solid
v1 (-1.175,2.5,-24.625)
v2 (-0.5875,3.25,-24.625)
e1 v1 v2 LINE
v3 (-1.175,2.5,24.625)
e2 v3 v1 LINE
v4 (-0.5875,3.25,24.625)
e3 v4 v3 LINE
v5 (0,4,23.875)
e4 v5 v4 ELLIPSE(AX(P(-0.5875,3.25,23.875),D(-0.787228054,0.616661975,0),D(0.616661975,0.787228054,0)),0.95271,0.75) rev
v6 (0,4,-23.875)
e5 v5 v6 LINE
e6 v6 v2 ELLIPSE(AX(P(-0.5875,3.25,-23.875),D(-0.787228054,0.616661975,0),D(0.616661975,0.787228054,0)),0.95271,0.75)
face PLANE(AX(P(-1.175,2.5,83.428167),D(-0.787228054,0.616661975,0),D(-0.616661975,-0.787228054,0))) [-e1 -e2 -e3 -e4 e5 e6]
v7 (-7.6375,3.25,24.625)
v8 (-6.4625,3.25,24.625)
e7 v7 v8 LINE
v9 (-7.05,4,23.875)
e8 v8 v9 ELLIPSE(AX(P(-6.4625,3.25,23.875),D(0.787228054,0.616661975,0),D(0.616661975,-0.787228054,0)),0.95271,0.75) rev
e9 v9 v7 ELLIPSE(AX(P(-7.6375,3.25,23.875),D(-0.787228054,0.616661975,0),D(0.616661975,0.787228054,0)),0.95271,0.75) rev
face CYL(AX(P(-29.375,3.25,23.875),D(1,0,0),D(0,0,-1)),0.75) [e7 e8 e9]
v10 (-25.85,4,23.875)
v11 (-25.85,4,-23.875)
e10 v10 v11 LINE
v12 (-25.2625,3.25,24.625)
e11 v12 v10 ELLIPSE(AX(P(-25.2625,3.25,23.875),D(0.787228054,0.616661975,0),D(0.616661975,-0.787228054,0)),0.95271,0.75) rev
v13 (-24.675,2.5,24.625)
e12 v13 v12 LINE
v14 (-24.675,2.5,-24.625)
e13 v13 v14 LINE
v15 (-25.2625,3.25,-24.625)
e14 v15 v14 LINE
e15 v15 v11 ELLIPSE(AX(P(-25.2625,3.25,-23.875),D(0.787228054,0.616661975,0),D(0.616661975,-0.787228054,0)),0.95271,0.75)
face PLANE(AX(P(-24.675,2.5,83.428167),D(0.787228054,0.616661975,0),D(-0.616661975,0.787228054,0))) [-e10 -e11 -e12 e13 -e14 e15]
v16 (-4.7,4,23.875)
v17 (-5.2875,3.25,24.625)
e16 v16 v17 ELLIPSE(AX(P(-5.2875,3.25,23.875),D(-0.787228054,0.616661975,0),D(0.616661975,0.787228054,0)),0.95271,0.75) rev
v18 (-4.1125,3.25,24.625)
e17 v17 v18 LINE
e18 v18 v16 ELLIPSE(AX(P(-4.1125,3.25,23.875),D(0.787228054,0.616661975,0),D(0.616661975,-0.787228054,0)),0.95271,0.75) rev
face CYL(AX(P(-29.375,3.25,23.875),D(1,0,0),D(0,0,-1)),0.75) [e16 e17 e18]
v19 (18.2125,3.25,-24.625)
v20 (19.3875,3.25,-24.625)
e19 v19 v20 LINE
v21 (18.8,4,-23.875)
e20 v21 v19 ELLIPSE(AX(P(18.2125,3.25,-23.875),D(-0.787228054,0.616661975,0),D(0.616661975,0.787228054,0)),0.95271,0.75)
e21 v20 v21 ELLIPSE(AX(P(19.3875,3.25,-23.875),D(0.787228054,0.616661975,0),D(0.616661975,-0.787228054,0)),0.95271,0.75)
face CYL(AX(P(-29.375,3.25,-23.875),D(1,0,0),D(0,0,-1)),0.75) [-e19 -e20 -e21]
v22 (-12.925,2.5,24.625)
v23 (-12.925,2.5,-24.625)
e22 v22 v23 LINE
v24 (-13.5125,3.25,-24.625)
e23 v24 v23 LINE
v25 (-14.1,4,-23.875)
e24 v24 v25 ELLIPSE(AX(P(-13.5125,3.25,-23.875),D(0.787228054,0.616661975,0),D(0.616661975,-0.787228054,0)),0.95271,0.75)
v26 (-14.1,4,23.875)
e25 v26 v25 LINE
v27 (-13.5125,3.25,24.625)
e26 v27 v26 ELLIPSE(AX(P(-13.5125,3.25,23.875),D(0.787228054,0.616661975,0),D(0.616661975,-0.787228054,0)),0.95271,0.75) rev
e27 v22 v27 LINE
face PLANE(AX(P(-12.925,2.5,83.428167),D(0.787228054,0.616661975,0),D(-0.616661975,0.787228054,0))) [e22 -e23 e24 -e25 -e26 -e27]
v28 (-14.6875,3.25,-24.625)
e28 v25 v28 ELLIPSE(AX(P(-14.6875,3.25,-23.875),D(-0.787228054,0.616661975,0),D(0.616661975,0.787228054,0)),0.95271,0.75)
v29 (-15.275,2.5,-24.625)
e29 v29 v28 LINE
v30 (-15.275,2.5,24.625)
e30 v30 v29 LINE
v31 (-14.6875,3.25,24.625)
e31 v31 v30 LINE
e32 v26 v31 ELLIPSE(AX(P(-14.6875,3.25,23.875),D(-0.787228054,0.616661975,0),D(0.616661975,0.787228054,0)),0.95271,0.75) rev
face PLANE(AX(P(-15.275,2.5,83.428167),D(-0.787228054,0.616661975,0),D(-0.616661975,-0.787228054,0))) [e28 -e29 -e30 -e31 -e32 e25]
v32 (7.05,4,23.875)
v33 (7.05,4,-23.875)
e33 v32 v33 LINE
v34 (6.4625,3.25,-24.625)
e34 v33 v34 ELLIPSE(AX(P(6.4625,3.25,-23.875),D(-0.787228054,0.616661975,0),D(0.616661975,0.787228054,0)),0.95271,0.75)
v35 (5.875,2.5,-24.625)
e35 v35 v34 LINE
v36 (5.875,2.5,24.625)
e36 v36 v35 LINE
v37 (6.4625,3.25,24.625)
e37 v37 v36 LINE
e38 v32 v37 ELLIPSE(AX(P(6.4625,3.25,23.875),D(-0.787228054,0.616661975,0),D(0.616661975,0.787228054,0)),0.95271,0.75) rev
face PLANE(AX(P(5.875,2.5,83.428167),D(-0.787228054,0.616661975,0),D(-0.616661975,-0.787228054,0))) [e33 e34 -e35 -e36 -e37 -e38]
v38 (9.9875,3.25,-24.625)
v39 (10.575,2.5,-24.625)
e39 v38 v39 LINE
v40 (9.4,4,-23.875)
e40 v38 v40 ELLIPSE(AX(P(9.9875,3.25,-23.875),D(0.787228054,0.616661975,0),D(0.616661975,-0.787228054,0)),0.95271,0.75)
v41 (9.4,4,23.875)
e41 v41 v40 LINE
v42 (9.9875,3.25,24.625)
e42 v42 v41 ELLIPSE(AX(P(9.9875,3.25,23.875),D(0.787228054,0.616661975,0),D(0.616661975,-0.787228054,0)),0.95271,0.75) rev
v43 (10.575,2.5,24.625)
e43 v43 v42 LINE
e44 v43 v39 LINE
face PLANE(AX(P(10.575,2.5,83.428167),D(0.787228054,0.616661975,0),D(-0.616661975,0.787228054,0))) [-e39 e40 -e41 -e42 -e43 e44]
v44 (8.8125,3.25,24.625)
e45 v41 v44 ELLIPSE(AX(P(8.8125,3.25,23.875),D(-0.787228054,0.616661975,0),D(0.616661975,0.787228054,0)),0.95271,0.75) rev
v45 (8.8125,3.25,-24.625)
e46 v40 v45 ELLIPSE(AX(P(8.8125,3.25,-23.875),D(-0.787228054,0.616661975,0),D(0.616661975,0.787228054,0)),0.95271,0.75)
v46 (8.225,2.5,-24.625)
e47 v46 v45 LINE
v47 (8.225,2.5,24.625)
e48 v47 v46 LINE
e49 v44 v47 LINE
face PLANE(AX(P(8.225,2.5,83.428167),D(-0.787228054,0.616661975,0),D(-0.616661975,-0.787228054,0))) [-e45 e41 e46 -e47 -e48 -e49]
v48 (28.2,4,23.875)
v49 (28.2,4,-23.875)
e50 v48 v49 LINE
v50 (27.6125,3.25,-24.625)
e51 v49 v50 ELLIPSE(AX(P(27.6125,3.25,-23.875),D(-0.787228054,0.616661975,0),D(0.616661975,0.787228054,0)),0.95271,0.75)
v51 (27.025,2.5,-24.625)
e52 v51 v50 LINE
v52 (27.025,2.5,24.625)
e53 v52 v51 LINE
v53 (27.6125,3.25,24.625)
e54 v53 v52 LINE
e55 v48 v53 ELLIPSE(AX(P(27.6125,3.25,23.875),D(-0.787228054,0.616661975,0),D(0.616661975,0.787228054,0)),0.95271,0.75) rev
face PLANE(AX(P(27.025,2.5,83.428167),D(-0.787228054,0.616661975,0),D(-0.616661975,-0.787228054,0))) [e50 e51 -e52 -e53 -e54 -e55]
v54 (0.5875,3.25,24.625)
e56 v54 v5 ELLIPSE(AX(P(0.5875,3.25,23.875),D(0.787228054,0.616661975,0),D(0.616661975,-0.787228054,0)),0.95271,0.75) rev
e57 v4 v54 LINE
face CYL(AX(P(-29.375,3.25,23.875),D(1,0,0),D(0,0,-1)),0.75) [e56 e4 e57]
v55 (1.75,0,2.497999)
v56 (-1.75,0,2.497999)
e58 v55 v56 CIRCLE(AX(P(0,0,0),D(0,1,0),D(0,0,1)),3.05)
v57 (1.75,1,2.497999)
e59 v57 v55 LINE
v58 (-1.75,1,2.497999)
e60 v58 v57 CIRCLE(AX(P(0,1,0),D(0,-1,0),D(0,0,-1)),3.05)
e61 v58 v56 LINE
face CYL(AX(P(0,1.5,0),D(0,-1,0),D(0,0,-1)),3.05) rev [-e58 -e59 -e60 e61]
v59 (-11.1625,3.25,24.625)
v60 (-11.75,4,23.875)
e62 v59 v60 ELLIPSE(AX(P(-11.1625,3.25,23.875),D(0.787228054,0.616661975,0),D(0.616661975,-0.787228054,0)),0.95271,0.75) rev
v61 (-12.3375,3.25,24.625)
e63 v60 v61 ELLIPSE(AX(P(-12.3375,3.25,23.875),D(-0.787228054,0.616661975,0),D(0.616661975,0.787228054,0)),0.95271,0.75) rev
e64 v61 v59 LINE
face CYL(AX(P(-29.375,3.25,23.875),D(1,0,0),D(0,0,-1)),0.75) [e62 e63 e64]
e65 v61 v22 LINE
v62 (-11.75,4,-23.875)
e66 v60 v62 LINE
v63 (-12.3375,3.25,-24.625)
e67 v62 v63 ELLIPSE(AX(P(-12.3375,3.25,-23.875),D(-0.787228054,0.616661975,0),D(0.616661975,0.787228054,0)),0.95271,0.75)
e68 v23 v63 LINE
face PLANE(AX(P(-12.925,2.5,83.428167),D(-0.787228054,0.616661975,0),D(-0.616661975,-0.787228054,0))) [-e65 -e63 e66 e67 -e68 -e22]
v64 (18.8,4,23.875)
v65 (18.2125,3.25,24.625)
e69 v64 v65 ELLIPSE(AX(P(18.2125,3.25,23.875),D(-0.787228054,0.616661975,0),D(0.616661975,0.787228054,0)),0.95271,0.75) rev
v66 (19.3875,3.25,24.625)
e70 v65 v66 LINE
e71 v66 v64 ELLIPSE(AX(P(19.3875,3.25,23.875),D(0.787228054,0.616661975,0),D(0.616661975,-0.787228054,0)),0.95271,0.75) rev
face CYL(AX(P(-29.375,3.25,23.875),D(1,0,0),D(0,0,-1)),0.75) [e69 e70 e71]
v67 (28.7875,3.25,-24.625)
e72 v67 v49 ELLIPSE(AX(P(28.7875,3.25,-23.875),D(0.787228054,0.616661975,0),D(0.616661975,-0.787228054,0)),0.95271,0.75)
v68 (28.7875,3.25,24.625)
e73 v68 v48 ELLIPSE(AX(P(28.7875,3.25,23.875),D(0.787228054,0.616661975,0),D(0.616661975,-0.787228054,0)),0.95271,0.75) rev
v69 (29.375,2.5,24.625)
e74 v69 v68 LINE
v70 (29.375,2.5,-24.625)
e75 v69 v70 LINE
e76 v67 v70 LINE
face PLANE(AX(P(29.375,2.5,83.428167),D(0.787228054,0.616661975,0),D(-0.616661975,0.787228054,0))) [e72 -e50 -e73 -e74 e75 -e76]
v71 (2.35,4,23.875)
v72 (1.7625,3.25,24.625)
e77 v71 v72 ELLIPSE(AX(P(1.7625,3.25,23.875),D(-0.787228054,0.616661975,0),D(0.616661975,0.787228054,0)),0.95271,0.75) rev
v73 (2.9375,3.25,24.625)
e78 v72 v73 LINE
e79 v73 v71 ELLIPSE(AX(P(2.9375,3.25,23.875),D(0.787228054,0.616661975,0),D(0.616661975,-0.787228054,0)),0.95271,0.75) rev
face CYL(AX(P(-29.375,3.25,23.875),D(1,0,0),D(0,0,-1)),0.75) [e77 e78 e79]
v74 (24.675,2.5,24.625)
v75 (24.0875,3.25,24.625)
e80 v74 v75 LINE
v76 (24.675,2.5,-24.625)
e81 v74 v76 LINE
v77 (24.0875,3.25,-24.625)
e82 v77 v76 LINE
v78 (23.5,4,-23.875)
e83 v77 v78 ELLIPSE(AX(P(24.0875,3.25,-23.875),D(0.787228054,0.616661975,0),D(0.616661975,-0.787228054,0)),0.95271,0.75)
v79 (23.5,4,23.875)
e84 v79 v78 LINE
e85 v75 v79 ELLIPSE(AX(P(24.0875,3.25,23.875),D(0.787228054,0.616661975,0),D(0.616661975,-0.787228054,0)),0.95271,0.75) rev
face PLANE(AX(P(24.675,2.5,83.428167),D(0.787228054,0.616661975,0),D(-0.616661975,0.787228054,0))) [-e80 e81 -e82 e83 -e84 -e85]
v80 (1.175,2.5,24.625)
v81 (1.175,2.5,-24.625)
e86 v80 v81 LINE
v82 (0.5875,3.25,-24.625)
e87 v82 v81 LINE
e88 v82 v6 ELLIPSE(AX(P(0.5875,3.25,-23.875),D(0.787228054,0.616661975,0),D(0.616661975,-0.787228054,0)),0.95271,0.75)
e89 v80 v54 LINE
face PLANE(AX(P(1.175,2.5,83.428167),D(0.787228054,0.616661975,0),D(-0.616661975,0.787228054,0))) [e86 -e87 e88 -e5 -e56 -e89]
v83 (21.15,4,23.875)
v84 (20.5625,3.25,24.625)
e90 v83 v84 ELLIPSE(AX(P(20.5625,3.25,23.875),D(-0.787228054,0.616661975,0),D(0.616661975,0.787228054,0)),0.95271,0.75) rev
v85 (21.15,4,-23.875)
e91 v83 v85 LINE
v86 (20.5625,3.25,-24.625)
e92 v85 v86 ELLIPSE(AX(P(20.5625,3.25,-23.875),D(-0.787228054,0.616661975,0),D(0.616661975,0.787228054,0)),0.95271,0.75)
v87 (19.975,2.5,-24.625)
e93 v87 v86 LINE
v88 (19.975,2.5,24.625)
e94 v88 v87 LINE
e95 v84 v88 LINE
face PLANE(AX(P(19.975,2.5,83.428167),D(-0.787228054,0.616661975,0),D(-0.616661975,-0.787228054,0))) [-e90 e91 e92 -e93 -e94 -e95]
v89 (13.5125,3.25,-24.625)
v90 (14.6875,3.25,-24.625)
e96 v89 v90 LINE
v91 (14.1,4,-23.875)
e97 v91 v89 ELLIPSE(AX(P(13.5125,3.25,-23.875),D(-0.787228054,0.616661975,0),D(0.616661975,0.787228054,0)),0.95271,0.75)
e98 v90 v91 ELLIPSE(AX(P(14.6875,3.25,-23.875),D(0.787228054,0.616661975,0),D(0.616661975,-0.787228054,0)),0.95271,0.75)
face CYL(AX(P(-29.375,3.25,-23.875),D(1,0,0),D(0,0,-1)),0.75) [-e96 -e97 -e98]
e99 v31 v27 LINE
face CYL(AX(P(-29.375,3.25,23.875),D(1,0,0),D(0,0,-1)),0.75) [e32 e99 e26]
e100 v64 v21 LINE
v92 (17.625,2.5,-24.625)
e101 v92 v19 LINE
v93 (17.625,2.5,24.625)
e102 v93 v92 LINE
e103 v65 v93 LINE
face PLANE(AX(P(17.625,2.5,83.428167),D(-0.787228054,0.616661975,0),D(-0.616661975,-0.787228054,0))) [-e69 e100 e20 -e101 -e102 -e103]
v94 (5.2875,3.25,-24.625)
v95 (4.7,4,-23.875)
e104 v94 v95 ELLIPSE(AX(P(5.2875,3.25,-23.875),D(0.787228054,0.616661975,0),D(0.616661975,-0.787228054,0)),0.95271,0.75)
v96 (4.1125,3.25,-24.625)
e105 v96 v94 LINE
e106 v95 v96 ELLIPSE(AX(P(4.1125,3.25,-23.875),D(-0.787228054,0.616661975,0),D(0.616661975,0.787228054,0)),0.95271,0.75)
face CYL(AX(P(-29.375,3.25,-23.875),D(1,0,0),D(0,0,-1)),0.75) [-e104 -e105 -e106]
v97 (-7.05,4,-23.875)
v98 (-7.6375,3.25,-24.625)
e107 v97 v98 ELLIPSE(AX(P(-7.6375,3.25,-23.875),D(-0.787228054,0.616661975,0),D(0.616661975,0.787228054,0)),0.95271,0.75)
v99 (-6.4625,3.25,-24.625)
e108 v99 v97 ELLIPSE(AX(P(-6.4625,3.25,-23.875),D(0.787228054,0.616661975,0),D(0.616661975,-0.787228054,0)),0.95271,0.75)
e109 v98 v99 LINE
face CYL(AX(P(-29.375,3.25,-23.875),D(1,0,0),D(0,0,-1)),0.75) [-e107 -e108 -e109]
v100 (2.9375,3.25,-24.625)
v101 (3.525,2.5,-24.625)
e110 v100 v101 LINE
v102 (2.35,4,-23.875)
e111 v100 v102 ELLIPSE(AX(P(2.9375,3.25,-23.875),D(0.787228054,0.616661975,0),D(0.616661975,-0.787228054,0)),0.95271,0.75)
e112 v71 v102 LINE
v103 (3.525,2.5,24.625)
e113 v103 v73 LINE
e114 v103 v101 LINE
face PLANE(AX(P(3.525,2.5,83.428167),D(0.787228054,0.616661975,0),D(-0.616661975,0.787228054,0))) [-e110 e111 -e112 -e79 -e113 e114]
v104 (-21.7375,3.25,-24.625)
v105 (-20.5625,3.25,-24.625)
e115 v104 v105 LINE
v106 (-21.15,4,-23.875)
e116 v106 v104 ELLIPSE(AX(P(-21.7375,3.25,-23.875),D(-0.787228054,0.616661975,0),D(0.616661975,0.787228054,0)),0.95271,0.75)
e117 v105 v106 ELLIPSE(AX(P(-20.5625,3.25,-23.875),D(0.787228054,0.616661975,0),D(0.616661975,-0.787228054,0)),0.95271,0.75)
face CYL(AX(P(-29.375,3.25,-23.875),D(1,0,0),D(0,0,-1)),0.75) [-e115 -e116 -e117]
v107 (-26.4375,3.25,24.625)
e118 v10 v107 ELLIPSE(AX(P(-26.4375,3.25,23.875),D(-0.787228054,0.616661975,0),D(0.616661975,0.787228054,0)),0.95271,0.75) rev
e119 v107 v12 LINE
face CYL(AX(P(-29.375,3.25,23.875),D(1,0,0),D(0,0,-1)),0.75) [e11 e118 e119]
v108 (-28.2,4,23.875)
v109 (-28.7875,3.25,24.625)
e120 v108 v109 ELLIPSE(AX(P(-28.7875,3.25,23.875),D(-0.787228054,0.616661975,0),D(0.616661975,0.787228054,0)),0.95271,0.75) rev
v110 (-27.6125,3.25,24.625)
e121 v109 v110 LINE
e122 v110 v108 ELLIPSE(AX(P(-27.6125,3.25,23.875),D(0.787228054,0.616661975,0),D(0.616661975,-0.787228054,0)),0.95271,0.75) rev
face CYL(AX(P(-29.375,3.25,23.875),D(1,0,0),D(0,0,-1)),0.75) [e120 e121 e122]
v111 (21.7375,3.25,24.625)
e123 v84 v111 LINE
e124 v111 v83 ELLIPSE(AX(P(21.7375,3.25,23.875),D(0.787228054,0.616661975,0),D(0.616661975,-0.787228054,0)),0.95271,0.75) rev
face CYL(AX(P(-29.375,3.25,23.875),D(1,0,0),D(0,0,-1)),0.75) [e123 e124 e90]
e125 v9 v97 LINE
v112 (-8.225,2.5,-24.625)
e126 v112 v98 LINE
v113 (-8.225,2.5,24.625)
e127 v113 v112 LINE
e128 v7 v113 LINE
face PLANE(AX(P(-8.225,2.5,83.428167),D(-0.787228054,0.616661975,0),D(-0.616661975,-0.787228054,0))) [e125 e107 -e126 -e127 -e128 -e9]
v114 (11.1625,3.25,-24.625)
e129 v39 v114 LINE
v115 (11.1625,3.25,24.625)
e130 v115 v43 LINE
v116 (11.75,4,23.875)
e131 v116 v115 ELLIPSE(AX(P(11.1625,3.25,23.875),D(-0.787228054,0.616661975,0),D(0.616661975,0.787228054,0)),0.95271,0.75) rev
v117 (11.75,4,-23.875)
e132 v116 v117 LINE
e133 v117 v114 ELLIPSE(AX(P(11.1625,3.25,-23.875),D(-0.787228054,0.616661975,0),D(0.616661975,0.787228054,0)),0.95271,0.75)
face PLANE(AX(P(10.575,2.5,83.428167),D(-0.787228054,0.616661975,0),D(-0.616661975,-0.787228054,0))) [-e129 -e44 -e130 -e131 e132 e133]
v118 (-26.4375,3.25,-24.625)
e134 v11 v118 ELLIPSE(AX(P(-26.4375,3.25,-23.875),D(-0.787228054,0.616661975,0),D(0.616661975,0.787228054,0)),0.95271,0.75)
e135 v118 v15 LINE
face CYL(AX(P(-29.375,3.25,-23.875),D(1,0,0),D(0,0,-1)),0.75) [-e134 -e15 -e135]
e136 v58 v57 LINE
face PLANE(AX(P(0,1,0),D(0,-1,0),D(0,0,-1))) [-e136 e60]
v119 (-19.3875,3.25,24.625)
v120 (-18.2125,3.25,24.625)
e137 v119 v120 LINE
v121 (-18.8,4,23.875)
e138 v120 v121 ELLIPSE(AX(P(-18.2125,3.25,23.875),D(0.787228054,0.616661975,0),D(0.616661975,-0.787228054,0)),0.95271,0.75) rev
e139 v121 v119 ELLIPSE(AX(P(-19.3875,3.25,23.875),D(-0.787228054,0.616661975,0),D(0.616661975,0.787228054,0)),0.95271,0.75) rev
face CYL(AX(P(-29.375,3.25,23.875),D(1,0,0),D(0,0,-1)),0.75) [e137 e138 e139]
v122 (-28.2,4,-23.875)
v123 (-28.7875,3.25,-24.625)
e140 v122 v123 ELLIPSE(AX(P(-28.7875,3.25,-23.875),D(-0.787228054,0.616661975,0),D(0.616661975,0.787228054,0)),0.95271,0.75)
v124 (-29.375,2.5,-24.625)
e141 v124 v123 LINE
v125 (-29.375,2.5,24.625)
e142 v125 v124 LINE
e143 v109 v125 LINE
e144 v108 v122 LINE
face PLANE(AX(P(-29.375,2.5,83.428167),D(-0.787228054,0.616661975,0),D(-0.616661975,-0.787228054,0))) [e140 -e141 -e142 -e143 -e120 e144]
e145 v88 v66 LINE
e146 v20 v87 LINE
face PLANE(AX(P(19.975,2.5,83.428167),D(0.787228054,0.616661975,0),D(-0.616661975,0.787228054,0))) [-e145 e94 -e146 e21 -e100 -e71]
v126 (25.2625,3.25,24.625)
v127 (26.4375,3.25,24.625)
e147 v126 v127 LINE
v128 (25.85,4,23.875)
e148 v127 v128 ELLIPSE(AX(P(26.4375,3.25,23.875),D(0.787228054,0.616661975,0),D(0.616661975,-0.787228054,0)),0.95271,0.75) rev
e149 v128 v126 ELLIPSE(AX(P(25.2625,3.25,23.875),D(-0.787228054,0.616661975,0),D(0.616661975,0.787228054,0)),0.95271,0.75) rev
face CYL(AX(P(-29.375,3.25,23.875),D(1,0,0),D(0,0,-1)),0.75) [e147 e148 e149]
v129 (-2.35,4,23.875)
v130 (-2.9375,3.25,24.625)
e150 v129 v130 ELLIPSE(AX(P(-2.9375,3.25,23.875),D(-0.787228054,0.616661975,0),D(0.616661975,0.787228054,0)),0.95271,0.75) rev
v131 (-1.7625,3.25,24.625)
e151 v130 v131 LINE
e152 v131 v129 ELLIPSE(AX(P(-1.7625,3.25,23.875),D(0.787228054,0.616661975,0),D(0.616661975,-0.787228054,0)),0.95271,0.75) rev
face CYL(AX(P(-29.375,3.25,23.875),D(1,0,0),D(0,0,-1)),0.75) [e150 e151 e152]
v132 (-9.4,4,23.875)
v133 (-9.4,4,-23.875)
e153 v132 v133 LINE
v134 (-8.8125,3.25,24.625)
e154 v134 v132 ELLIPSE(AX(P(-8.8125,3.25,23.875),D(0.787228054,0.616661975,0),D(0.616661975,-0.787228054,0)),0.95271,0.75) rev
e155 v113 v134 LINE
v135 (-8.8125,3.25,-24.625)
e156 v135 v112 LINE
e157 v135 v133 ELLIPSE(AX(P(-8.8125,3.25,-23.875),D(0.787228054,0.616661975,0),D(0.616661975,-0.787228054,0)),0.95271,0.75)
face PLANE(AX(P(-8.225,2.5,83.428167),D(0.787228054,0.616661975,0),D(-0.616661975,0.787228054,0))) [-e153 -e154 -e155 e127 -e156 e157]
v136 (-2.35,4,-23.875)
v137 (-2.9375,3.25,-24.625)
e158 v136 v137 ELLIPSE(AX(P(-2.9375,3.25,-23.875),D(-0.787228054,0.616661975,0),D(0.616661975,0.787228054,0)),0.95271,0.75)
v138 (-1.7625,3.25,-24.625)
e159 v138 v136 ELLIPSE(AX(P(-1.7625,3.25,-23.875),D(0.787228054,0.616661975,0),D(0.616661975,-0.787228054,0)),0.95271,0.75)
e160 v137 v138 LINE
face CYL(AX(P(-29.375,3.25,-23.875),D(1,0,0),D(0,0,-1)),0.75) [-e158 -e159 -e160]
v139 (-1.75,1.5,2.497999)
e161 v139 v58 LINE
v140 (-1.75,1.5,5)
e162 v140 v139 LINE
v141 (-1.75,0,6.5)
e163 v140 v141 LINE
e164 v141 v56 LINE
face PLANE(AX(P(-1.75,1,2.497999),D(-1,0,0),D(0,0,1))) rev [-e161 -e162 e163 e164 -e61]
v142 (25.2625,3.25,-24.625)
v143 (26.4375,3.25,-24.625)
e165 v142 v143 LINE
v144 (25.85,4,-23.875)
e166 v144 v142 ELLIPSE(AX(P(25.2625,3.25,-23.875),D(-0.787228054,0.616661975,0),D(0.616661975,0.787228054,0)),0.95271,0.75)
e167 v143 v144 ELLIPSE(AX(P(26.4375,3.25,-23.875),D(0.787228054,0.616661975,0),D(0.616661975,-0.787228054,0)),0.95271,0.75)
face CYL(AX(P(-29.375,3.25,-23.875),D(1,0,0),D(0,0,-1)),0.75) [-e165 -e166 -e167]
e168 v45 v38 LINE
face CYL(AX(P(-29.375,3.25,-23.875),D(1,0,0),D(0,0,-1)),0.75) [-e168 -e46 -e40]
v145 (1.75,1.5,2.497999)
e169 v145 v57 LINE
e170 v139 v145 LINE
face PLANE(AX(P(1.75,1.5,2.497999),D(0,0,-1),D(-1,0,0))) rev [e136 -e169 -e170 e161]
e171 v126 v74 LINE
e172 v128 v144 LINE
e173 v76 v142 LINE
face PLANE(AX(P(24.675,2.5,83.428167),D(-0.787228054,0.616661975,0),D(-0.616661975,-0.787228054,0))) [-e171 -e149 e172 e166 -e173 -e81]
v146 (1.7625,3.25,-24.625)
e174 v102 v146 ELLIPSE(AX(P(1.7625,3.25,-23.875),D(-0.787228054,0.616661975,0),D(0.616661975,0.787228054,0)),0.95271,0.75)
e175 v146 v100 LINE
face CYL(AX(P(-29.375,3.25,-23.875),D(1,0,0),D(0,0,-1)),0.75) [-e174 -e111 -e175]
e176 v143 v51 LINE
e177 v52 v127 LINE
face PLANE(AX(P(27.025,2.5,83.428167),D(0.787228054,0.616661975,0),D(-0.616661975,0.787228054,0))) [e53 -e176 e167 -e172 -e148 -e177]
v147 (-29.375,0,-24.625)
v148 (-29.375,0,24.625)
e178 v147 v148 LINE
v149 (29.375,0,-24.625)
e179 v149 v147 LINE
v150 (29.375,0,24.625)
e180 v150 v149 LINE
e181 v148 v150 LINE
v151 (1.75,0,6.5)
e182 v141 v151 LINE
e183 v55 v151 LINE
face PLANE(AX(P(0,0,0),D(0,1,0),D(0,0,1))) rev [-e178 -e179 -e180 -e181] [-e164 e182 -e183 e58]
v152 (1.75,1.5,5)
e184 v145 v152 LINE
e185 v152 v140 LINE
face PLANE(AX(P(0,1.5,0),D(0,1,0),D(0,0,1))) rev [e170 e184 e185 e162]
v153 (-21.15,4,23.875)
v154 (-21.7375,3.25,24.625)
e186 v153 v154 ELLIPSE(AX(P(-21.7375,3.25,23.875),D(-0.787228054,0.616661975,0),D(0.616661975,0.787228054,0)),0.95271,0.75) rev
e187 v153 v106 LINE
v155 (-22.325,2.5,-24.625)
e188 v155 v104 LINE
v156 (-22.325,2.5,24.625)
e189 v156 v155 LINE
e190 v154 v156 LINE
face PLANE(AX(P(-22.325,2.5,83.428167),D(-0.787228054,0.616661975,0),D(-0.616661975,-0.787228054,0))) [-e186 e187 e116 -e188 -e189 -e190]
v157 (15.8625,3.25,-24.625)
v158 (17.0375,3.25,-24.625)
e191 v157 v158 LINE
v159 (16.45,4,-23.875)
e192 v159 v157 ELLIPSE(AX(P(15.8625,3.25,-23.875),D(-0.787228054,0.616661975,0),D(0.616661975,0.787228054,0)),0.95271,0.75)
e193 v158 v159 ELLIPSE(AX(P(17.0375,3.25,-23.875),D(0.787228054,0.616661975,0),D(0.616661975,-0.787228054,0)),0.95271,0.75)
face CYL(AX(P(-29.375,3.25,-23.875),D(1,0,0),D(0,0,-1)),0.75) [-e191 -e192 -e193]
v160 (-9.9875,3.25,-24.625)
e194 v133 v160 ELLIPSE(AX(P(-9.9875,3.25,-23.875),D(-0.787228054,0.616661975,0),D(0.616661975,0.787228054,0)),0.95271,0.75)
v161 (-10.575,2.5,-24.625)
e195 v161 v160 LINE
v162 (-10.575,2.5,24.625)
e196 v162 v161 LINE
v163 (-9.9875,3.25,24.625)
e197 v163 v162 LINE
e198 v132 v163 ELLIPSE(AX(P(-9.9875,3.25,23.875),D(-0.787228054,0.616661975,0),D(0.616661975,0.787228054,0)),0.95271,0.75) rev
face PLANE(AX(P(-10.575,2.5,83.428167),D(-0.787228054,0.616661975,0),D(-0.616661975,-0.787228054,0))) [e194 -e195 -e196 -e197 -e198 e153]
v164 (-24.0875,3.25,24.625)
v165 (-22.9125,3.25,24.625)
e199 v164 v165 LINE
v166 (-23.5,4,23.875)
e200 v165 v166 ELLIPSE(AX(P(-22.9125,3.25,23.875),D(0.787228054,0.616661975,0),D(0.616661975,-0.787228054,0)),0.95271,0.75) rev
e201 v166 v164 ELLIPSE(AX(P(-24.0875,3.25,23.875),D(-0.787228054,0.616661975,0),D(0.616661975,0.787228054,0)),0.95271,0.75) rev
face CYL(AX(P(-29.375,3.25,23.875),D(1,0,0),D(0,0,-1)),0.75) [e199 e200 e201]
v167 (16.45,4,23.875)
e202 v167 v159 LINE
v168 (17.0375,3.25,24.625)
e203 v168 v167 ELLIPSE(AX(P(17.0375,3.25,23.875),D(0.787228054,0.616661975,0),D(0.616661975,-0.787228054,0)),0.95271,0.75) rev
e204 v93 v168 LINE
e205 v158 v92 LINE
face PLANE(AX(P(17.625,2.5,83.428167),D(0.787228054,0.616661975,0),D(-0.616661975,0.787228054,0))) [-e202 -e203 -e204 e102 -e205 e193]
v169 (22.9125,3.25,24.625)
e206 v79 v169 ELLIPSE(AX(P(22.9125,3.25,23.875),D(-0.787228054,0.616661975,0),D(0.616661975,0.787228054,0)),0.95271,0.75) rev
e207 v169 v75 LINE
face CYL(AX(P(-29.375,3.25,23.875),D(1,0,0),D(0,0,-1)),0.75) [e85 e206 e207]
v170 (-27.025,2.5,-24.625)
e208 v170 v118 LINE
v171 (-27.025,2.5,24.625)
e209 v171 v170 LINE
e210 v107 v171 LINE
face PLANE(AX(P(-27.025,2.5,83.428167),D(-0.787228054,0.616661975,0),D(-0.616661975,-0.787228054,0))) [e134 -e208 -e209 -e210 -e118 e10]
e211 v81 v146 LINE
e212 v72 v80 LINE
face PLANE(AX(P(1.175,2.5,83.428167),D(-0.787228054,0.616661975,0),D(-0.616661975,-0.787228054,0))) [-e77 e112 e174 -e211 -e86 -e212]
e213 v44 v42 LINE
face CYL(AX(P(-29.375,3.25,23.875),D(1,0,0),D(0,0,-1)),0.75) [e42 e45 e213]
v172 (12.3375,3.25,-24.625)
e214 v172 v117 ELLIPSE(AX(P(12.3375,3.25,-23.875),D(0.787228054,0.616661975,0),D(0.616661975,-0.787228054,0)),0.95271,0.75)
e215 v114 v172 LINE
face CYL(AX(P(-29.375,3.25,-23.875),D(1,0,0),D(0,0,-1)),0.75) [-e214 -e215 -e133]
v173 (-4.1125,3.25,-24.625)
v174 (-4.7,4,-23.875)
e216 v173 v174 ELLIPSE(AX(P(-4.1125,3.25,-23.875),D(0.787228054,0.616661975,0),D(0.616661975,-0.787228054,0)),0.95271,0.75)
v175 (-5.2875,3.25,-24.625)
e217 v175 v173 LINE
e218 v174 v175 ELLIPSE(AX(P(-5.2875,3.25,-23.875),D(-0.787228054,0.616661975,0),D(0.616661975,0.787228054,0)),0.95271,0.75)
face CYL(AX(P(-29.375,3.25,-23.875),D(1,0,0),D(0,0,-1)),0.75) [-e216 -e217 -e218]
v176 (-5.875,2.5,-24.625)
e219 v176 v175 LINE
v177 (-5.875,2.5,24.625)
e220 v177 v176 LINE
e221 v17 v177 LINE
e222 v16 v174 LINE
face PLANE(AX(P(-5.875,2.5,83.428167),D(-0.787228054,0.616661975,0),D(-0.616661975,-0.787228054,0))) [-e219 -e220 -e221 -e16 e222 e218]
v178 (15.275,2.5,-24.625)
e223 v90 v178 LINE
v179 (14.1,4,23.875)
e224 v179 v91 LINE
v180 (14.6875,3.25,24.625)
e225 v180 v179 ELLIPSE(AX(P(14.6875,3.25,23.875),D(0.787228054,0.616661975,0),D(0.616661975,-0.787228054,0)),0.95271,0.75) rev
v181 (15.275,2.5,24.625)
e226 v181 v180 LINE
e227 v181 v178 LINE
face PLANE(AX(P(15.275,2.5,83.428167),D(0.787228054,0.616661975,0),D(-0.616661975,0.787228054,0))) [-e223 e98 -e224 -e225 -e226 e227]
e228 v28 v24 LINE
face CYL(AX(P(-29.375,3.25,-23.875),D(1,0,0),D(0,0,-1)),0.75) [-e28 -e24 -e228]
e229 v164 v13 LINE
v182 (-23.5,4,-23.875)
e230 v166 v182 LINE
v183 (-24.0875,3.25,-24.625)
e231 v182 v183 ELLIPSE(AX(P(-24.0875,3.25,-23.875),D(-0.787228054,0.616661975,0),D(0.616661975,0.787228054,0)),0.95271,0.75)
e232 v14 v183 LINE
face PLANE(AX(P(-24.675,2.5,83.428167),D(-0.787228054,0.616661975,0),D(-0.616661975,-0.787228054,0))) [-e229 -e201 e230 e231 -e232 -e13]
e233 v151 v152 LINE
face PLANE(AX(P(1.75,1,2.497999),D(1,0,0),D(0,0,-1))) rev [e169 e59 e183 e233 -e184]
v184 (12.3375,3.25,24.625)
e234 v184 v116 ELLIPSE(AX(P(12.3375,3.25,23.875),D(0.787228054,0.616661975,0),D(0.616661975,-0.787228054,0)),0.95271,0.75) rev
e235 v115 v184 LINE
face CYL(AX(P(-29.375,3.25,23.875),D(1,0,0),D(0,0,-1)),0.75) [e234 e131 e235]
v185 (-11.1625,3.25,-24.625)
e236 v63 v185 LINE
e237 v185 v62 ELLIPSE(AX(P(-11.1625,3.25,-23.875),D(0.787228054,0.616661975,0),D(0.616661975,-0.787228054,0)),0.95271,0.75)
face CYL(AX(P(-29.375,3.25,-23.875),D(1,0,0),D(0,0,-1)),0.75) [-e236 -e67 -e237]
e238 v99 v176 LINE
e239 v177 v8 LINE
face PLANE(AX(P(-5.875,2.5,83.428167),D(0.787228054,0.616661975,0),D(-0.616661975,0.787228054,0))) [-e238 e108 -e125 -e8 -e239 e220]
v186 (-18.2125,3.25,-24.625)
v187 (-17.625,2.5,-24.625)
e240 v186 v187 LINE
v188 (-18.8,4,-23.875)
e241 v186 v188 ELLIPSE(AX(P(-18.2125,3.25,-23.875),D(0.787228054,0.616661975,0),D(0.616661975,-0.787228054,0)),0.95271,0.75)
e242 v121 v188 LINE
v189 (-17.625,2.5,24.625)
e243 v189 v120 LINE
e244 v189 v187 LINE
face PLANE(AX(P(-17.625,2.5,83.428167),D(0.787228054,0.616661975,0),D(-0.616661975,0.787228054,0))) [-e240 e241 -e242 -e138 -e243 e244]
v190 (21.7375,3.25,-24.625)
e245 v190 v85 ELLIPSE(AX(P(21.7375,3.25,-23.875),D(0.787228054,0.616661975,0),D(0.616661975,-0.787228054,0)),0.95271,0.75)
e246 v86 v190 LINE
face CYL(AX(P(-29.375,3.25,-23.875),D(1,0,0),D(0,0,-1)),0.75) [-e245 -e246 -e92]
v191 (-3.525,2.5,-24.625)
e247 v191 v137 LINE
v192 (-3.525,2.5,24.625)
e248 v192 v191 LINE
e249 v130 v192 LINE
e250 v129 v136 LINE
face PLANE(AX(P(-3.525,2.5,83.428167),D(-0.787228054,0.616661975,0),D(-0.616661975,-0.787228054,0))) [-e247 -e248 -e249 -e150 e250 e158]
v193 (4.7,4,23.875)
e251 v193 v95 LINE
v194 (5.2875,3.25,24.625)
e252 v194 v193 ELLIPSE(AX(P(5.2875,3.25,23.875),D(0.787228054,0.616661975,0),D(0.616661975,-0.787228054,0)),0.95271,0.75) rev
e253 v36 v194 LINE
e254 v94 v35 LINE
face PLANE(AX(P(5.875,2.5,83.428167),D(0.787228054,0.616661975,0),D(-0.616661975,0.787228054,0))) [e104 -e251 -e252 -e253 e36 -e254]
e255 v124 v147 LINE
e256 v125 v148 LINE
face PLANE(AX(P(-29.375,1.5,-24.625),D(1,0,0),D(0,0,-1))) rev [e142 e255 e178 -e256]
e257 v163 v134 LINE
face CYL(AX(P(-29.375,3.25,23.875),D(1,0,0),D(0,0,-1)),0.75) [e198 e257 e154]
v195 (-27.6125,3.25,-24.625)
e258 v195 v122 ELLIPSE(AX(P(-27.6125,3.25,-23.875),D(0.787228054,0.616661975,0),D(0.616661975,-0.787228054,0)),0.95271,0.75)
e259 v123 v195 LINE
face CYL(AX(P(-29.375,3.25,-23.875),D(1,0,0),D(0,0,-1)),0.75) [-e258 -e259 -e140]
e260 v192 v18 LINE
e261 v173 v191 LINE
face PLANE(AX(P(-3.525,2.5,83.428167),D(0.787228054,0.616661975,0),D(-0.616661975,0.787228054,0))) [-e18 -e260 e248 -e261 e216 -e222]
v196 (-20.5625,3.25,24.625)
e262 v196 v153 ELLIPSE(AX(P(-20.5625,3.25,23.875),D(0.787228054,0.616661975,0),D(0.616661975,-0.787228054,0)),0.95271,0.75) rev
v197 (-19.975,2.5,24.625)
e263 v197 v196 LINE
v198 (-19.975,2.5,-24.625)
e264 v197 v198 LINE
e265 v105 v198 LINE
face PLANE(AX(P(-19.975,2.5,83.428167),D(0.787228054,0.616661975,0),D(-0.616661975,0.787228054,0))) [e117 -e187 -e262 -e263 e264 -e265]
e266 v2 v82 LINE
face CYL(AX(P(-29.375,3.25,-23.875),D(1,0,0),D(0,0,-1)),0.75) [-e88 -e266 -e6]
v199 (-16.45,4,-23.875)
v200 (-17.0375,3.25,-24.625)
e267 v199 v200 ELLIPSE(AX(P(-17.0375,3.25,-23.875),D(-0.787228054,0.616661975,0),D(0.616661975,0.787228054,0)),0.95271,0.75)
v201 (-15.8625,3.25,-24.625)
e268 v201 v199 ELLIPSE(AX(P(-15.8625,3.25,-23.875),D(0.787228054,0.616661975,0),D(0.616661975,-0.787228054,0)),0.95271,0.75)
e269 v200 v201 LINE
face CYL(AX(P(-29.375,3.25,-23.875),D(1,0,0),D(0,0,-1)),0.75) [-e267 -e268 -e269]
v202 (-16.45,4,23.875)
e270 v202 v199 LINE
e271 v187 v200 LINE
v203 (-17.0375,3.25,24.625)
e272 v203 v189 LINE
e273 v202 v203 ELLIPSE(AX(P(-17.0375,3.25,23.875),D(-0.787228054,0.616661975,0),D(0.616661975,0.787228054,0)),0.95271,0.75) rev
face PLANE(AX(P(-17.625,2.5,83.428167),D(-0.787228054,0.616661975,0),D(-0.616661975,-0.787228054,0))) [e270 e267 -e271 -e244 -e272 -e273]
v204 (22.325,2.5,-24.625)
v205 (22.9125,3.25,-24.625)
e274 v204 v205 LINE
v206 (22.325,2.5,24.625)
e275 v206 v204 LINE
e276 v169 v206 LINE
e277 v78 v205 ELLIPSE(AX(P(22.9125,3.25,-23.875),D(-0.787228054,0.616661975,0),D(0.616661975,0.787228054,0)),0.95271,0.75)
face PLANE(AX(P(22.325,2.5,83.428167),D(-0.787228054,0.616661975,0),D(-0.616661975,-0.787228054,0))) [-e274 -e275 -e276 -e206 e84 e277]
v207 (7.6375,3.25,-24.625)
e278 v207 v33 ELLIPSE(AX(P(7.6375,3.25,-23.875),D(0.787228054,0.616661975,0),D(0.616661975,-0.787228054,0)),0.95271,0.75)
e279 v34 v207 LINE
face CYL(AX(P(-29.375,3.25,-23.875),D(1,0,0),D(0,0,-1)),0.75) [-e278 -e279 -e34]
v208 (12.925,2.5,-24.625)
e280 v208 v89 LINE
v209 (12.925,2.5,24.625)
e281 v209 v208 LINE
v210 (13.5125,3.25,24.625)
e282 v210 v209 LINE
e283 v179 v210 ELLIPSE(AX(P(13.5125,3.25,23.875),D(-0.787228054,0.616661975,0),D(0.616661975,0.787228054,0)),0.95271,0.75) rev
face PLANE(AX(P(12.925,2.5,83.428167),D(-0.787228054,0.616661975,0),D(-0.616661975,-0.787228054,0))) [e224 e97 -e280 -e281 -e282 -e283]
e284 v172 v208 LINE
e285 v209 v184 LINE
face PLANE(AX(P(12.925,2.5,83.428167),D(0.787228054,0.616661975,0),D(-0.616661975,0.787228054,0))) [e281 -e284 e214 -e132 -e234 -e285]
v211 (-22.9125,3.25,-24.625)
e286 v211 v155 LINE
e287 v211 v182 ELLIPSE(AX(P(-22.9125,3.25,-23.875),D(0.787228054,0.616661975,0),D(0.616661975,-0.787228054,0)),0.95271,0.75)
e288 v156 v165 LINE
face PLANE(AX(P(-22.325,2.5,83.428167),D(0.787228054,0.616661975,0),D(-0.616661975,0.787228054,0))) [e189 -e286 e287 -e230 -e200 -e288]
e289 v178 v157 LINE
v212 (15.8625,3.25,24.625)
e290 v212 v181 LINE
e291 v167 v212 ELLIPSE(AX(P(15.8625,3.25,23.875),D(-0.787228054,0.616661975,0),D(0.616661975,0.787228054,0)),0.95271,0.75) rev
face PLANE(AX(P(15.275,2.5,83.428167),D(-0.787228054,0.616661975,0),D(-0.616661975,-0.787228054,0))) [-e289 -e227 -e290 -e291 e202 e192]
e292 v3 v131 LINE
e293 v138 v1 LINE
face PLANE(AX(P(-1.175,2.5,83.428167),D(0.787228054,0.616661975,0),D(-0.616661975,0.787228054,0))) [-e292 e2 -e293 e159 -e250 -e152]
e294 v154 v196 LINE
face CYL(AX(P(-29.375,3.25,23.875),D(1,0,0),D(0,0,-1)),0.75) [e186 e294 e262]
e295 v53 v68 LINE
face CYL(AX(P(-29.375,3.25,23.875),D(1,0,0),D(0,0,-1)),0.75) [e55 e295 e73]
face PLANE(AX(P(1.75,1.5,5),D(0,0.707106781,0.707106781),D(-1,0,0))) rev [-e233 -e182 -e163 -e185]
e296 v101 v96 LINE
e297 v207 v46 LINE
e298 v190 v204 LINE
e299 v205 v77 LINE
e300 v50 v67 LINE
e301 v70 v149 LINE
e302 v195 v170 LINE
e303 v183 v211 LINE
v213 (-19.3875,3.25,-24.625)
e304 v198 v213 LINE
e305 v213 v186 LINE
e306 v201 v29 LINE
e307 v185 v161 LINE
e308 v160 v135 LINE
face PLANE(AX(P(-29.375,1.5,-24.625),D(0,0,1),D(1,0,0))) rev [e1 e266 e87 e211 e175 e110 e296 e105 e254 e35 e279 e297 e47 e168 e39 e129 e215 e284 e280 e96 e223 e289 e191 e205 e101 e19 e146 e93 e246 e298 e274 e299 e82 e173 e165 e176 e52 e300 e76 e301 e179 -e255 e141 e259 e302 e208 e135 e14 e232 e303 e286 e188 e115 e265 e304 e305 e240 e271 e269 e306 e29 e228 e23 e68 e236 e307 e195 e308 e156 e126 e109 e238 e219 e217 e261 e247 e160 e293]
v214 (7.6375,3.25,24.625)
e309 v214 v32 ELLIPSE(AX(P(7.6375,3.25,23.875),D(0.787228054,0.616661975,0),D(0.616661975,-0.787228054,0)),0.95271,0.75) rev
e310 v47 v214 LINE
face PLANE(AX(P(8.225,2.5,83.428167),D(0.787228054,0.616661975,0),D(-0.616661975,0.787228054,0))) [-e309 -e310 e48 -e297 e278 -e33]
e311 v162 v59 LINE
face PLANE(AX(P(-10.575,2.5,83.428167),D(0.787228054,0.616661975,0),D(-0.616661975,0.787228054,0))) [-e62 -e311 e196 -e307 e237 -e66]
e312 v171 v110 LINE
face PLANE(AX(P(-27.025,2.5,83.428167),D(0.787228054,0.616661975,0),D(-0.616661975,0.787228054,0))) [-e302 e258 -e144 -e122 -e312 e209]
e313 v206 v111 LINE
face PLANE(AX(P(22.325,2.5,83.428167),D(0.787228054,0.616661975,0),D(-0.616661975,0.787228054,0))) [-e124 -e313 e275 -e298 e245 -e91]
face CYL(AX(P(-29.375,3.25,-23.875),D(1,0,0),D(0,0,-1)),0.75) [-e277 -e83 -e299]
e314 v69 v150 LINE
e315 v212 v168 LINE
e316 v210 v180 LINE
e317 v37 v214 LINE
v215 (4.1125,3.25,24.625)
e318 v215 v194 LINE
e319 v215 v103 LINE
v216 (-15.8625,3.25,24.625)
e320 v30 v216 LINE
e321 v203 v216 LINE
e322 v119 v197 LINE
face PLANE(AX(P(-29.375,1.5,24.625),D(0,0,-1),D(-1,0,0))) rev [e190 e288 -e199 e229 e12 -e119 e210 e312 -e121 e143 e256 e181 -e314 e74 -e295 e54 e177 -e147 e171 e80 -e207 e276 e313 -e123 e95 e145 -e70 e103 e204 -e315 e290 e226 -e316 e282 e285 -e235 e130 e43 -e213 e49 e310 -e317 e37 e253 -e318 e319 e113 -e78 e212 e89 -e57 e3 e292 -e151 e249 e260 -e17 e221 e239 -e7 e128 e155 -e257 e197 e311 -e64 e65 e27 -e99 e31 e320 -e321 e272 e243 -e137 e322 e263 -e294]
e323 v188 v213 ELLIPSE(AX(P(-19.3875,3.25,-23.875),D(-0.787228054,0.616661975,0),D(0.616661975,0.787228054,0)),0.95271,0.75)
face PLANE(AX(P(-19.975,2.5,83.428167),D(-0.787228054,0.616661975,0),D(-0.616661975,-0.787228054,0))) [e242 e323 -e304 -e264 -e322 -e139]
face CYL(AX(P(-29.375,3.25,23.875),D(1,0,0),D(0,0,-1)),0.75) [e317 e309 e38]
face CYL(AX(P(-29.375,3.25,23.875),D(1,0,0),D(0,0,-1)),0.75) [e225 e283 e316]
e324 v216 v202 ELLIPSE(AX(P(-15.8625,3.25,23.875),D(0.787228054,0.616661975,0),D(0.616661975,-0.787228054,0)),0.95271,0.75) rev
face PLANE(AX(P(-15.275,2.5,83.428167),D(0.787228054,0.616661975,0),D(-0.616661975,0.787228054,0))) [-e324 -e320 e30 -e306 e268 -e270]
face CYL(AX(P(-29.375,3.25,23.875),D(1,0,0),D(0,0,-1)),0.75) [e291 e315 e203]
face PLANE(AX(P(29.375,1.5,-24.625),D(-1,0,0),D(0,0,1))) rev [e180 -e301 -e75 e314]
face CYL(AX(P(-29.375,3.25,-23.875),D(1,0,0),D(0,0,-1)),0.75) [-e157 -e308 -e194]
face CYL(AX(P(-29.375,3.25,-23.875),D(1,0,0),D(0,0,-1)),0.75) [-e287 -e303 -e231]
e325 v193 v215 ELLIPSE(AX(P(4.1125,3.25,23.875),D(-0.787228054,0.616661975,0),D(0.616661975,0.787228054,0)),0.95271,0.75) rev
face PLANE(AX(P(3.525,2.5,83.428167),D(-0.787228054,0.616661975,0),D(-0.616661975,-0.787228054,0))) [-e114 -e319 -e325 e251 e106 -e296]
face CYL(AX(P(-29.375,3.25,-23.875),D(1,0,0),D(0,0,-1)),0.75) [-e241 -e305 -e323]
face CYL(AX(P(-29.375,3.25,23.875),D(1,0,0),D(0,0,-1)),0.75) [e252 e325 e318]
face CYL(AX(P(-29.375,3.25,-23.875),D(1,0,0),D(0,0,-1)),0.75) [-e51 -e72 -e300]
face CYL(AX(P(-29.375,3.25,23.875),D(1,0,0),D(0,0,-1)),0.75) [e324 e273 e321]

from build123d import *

# Parameters (mm, degrees)
SKETCH1_R           = 3.05
BOSS_EXTRUDE1_DEPTH = 1.5
BOSS_EXTRUDE2_DEPTH = 49.25
CUT_EXTRUDE1_DEPTH  = 1
CUT_EXTRUDE3_DEPTH  = 64.82752638948185
SKETCH5_R           = 3.099999999999995
BOSS_EXTRUDE3_DEPTH = 0.5
CUT_EXTRUDE4_DEPTH  = 0.5
CHAMFER3_SIZE       = 1.5


with BuildPart() as part:
    # Sketch1 → Boss-Extrude1 (new body)
    with BuildSketch(Plane(origin=(0, 0, 0), x_dir=(1, 0, 0), z_dir=(0, 1, 0))):
        Polygon((-29.375, 24.624999999999996), (29.375, 24.624999999999996), (29.375000000000004, -24.625000000000004), (-29.374999999999993, -24.625000000000004), align=None)
        with Locations(Location((-3.47e-15, -3.47e-15, 0), (0, 0, 270))):
            Circle(SKETCH1_R, mode=Mode.SUBTRACT)
    extrude(amount=BOSS_EXTRUDE1_DEPTH)

    # Sketch2 → Boss-Extrude2 (add)
    with BuildSketch(Plane(origin=(0, 0, -24.624999999999996), x_dir=(-1, 0, 0), z_dir=(0, 0, -1))):
        Polygon((-29.375, 1.5), (29.375, 1.5), (29.375, 2.5), (28.199999999999996, 4), (27.025, 2.5), (25.849999999999998, 4), (24.675, 2.5), (23.499999999999996, 4), (22.325, 2.5), (21.149999999999995, 4), (19.974999999999998, 2.5), (18.799999999999997, 4), (17.625, 2.5), (16.45, 4), (15.275, 2.5), (14.099999999999998, 4), (12.924999999999999, 2.5), (11.749999999999998, 4), (10.575, 2.5), (9.399999999999999, 4), (8.225, 2.5), (7.049999999999999, 4), (5.874999999999999, 2.5), (4.699999999999999, 4), (3.525, 2.5), (2.3499999999999996, 4), (1.1749999999999996, 2.5), (0, 4), (-1.1749999999999996, 2.5), (-2.3499999999999996, 4), (-3.525, 2.5), (-4.699999999999999, 4), (-5.874999999999999, 2.5), (-7.049999999999999, 4), (-8.225, 2.5), (-9.399999999999999, 4), (-10.575, 2.5), (-11.749999999999998, 4), (-12.924999999999999, 2.5), (-14.099999999999998, 4), (-15.275, 2.5), (-16.45, 4), (-17.625, 2.5), (-18.799999999999997, 4), (-19.974999999999998, 2.5), (-21.149999999999995, 4), (-22.325, 2.5), (-23.499999999999996, 4), (-24.675, 2.5), (-25.849999999999998, 4), (-27.025, 2.5), (-28.199999999999996, 4), (-29.375, 2.5), align=None)
    extrude(amount=-BOSS_EXTRUDE2_DEPTH)

    # Sketch3 → Cut-Extrude1 (cut)
    with BuildSketch(Plane(origin=(0, 0, 0), x_dir=(-1, 0, 0), z_dir=(0, -1, 0))):
        with BuildLine():
            Line((-1.7499999999999998, -2.497999199359359), (-1.7499999999999993, -5))
            Line((-1.7499999999999993, -5), (1.7500000000000007, -5))
            Line((1.7500000000000007, -5), (1.7499999999999998, -2.4979991993593593))
            ThreePointArc((1.7499999999999998, -2.4979991993593593), (1.54e-15, 3.05), (-1.7499999999999998, -2.497999199359359))
        make_face()
    extrude(amount=-CUT_EXTRUDE1_DEPTH, mode=Mode.SUBTRACT)

    # Sketch4 → Cut-Extrude3 (cut, through all)
    with BuildSketch(Plane(origin=(29.375000000000004, 0, -4.14e-15), x_dir=(-1.4e-16, 0, -1), z_dir=(1, 0, -1.4e-16))):
        with BuildLine():
            Line((-23.875000000000007, 4), (-24.625000000000007, 4))
            Line((-24.625000000000007, 4), (-24.625000000000007, 3.2500000000000004))
            ThreePointArc((-24.625000000000007, 3.2500000000000004), (-24.40533008588992, 3.7803300858899114), (-23.875000000000007, 4))
        make_face()
    cut_extrude3 = extrude(amount=-CUT_EXTRUDE3_DEPTH, mode=Mode.SUBTRACT)

    # Mirror1: Cut-Extrude3 across plane
    add(cut_extrude3.mirror(Plane.XY), mode=Mode.SUBTRACT)

    # Sketch5 → Boss-Extrude3 (add)
    with BuildSketch(Plane.XZ.offset(-1.5)):
        Circle(SKETCH5_R)
    extrude(amount=BOSS_EXTRUDE3_DEPTH)

    # Sketch6 → Cut-Extrude4 (cut)
    with BuildSketch(Plane.XZ.offset(-1)):
        Polygon((1.7499999999999993, 5), (-1.7499999999999998, 5), (-1.7500000000000027, 2.497999199359363), (1.7499999999999993, 2.497999199359363), align=None)
    extrude(amount=-CUT_EXTRUDE4_DEPTH, mode=Mode.SUBTRACT)

    # Chamfer3
    chamfer3_edges = [part.edges().sort_by_distance(p)[0] for p in [
        (-6.7e-16, 0, 5),
    ]]
    chamfer(chamfer3_edges, length=CHAMFER3_SIZE - 0.0001)  # a hair under: the kernel refuses the full size


solid = part.part
